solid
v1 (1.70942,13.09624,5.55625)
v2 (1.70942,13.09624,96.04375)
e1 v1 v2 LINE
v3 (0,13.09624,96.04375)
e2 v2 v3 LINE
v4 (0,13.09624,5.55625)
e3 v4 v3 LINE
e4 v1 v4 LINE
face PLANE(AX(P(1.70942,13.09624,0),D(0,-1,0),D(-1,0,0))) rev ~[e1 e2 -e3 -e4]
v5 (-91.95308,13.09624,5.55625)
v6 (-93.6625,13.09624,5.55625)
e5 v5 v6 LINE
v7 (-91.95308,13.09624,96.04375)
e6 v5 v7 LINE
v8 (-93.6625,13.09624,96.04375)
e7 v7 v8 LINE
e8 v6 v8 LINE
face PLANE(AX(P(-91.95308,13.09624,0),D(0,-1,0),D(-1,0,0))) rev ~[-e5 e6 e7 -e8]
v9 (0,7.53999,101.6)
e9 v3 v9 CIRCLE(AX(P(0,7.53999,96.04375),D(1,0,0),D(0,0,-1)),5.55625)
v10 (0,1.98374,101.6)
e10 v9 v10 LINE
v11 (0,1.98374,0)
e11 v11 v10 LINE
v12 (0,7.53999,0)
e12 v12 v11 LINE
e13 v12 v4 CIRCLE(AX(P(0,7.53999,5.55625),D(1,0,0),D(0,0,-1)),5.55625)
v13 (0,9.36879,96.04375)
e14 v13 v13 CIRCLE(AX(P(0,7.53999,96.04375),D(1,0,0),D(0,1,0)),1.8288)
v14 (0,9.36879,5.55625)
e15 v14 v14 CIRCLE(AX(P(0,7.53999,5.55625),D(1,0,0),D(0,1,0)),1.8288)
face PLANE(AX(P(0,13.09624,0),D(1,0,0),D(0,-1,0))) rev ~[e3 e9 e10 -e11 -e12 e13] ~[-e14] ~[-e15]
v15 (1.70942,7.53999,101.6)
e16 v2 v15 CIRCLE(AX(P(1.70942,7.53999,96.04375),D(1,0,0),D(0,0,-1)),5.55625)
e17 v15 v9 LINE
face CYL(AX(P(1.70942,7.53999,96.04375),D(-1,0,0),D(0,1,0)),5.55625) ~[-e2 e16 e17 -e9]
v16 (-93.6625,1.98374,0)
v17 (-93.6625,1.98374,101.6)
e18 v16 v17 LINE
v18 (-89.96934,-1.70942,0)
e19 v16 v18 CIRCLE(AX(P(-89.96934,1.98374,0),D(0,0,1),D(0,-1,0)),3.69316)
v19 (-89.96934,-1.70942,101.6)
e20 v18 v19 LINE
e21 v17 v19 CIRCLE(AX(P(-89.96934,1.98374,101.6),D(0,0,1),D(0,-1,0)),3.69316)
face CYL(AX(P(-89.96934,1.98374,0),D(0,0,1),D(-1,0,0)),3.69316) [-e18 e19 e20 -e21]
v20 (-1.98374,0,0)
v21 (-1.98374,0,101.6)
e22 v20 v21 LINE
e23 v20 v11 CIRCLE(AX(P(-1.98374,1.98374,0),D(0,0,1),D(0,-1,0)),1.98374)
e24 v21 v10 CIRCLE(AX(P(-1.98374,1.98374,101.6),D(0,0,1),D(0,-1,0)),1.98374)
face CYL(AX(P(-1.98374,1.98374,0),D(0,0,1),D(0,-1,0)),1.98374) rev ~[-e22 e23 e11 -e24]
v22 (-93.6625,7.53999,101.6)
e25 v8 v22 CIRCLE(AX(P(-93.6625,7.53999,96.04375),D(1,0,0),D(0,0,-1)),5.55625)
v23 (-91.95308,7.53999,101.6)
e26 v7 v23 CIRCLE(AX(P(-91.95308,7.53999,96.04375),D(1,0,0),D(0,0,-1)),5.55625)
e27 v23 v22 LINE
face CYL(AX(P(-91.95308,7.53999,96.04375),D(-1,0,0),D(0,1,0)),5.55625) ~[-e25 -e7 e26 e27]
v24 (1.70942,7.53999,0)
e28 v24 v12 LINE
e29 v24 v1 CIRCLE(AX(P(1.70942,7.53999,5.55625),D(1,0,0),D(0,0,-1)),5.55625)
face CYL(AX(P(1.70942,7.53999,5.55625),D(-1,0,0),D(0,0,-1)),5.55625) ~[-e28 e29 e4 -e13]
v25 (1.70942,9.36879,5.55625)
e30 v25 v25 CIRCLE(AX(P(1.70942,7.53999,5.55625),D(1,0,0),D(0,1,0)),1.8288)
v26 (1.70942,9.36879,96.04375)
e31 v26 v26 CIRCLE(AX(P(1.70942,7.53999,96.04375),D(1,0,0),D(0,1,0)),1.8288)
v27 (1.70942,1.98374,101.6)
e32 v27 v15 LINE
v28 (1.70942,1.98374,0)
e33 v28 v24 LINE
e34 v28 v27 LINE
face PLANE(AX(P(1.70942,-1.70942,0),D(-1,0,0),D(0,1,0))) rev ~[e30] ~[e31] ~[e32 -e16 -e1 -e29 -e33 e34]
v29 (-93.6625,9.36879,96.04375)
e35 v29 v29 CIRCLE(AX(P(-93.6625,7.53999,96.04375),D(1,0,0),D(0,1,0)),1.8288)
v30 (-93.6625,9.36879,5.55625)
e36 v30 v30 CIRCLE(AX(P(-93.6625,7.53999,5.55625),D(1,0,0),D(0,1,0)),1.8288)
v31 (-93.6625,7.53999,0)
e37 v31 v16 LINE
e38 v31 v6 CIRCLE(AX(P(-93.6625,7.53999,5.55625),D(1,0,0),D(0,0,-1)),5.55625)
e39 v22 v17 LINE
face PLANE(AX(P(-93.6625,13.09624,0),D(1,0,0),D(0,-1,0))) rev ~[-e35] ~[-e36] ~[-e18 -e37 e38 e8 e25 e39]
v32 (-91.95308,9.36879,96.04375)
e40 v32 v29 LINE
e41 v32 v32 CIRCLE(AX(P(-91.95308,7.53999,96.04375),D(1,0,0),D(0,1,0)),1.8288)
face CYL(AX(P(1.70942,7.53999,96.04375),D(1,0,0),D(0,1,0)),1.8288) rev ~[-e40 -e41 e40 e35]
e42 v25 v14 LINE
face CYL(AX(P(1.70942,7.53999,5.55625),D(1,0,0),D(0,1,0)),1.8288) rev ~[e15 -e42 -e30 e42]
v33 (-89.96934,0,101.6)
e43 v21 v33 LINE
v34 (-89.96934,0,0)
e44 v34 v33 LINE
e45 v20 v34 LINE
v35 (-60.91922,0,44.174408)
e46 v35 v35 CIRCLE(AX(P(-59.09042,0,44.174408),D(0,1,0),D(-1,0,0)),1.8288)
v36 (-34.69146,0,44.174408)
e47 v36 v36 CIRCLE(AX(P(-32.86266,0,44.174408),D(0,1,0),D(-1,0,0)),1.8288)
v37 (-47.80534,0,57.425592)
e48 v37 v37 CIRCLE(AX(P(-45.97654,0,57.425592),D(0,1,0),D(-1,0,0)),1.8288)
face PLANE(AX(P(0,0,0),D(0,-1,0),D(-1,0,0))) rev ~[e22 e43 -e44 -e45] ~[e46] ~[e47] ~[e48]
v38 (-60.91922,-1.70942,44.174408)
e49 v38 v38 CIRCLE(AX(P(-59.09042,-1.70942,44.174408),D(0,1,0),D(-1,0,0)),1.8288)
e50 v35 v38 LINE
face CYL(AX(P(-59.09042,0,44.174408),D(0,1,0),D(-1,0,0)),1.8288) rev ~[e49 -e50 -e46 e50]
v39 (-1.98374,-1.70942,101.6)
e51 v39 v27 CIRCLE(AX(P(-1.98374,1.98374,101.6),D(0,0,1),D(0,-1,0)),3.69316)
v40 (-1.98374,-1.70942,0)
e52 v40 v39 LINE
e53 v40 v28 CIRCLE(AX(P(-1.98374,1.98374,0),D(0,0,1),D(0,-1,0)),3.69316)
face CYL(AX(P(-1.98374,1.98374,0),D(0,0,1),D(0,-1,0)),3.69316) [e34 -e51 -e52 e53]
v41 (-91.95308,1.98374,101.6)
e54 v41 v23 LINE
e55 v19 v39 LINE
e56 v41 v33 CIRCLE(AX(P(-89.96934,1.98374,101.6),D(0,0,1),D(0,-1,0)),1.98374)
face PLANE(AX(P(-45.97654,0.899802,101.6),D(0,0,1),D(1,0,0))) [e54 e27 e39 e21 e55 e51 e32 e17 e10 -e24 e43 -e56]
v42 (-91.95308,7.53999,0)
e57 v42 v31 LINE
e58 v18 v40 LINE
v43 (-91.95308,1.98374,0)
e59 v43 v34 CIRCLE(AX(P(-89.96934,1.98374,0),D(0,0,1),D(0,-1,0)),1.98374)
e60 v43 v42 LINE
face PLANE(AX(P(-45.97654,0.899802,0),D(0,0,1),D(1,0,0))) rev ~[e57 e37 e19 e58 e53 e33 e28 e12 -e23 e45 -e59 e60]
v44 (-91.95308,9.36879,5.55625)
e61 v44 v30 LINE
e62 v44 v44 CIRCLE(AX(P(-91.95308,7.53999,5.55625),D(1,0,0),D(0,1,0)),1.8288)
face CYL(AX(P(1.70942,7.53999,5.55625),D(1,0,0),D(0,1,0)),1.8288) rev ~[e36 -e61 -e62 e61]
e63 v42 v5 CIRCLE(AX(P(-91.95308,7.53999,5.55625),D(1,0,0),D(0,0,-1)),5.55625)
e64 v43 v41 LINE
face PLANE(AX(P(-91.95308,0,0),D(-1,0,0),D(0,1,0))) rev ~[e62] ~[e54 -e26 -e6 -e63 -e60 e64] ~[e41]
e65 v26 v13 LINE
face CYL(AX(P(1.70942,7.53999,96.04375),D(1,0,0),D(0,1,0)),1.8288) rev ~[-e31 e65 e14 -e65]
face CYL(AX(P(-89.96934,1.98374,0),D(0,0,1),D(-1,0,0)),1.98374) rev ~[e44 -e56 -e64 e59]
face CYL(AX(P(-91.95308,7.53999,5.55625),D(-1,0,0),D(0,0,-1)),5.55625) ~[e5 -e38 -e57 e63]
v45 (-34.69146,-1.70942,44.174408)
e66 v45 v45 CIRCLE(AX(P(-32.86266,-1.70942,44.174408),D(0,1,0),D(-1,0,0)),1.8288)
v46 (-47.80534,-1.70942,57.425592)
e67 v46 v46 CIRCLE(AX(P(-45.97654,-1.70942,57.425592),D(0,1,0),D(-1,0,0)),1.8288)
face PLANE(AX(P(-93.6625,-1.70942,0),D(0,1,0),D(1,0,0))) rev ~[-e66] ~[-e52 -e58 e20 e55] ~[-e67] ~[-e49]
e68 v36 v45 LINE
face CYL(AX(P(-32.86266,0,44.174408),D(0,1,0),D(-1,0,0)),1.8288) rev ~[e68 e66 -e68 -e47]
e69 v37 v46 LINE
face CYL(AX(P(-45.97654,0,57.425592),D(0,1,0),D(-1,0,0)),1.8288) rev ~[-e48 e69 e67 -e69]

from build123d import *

# Parameters (mm, degrees)
F1_DEPTH = 101.6
F2_R     = 3.69316
F3_R     = 1.98374
F4_R     = 1.8288
F5_DEPTH = 95.37192
F6_R     = 5.55625
F7_R     = 1.8288
F8_DEPTH = 1.70942


with BuildPart() as f1:
    # F0 (on Top) → F1 (new body)
    with BuildSketch(Plane.XY):
        Polygon((0, 13.09624), (0, 0), (-91.95308, 0), (-91.95308, 13.09624), (-93.6625, 13.09624), (-93.6625, -1.70942), (1.70942, -1.70942), (1.70942, 13.09624), align=None)
    extrude(amount=F1_DEPTH)

    # F2
    f2_edges = [f1.edges().sort_by_distance(p)[0] for p in [
        (1.70942, -1.70942, 50.8),
        (-93.6625, -1.70942, 50.8),
    ]]
    fillet(f2_edges, radius=F2_R)

    # F3
    f3_edges = [f1.edges().sort_by_distance(p)[0] for p in [
        (0, 0, 50.8),
        (-91.95308, 0, 50.8),
    ]]
    fillet(f3_edges, radius=F3_R)

    # F4 (on face) → F5 (cut, through all)
    with BuildSketch(Plane.YZ.offset(1.70942)):
        with Locations((7.53999, 96.04375)):
            Circle(F4_R)
        with Locations((7.53999, 5.55625)):
            Circle(F4_R)
    extrude(amount=-F5_DEPTH, mode=Mode.SUBTRACT)

    # F6
    f6_edges = [f1.edges().sort_by_distance(p)[0] for p in [
        (-92.80779, 13.09624, 101.6),
        (-92.80779, 13.09624, 0),
        (0.85471, 13.09624, 0),
        (0.85471, 13.09624, 101.6),
    ]]
    fillet(f6_edges, radius=F6_R)

    # F7 (on face) → F8 (cut, through all)
    with BuildSketch(Plane(origin=(0, 0, 0), x_dir=(-1, 0, 0), z_dir=(0, 1, 0))):
        with Locations((59.0904203, 44.1744082526)):
            Circle(F7_R)
        with Locations((45.97654, 57.4255917474)):
            Circle(F7_R)
        with Locations((32.8626597, 44.1744082526)):
            Circle(F7_R)
    extrude(amount=-F8_DEPTH, mode=Mode.SUBTRACT)


solid = f1.part
